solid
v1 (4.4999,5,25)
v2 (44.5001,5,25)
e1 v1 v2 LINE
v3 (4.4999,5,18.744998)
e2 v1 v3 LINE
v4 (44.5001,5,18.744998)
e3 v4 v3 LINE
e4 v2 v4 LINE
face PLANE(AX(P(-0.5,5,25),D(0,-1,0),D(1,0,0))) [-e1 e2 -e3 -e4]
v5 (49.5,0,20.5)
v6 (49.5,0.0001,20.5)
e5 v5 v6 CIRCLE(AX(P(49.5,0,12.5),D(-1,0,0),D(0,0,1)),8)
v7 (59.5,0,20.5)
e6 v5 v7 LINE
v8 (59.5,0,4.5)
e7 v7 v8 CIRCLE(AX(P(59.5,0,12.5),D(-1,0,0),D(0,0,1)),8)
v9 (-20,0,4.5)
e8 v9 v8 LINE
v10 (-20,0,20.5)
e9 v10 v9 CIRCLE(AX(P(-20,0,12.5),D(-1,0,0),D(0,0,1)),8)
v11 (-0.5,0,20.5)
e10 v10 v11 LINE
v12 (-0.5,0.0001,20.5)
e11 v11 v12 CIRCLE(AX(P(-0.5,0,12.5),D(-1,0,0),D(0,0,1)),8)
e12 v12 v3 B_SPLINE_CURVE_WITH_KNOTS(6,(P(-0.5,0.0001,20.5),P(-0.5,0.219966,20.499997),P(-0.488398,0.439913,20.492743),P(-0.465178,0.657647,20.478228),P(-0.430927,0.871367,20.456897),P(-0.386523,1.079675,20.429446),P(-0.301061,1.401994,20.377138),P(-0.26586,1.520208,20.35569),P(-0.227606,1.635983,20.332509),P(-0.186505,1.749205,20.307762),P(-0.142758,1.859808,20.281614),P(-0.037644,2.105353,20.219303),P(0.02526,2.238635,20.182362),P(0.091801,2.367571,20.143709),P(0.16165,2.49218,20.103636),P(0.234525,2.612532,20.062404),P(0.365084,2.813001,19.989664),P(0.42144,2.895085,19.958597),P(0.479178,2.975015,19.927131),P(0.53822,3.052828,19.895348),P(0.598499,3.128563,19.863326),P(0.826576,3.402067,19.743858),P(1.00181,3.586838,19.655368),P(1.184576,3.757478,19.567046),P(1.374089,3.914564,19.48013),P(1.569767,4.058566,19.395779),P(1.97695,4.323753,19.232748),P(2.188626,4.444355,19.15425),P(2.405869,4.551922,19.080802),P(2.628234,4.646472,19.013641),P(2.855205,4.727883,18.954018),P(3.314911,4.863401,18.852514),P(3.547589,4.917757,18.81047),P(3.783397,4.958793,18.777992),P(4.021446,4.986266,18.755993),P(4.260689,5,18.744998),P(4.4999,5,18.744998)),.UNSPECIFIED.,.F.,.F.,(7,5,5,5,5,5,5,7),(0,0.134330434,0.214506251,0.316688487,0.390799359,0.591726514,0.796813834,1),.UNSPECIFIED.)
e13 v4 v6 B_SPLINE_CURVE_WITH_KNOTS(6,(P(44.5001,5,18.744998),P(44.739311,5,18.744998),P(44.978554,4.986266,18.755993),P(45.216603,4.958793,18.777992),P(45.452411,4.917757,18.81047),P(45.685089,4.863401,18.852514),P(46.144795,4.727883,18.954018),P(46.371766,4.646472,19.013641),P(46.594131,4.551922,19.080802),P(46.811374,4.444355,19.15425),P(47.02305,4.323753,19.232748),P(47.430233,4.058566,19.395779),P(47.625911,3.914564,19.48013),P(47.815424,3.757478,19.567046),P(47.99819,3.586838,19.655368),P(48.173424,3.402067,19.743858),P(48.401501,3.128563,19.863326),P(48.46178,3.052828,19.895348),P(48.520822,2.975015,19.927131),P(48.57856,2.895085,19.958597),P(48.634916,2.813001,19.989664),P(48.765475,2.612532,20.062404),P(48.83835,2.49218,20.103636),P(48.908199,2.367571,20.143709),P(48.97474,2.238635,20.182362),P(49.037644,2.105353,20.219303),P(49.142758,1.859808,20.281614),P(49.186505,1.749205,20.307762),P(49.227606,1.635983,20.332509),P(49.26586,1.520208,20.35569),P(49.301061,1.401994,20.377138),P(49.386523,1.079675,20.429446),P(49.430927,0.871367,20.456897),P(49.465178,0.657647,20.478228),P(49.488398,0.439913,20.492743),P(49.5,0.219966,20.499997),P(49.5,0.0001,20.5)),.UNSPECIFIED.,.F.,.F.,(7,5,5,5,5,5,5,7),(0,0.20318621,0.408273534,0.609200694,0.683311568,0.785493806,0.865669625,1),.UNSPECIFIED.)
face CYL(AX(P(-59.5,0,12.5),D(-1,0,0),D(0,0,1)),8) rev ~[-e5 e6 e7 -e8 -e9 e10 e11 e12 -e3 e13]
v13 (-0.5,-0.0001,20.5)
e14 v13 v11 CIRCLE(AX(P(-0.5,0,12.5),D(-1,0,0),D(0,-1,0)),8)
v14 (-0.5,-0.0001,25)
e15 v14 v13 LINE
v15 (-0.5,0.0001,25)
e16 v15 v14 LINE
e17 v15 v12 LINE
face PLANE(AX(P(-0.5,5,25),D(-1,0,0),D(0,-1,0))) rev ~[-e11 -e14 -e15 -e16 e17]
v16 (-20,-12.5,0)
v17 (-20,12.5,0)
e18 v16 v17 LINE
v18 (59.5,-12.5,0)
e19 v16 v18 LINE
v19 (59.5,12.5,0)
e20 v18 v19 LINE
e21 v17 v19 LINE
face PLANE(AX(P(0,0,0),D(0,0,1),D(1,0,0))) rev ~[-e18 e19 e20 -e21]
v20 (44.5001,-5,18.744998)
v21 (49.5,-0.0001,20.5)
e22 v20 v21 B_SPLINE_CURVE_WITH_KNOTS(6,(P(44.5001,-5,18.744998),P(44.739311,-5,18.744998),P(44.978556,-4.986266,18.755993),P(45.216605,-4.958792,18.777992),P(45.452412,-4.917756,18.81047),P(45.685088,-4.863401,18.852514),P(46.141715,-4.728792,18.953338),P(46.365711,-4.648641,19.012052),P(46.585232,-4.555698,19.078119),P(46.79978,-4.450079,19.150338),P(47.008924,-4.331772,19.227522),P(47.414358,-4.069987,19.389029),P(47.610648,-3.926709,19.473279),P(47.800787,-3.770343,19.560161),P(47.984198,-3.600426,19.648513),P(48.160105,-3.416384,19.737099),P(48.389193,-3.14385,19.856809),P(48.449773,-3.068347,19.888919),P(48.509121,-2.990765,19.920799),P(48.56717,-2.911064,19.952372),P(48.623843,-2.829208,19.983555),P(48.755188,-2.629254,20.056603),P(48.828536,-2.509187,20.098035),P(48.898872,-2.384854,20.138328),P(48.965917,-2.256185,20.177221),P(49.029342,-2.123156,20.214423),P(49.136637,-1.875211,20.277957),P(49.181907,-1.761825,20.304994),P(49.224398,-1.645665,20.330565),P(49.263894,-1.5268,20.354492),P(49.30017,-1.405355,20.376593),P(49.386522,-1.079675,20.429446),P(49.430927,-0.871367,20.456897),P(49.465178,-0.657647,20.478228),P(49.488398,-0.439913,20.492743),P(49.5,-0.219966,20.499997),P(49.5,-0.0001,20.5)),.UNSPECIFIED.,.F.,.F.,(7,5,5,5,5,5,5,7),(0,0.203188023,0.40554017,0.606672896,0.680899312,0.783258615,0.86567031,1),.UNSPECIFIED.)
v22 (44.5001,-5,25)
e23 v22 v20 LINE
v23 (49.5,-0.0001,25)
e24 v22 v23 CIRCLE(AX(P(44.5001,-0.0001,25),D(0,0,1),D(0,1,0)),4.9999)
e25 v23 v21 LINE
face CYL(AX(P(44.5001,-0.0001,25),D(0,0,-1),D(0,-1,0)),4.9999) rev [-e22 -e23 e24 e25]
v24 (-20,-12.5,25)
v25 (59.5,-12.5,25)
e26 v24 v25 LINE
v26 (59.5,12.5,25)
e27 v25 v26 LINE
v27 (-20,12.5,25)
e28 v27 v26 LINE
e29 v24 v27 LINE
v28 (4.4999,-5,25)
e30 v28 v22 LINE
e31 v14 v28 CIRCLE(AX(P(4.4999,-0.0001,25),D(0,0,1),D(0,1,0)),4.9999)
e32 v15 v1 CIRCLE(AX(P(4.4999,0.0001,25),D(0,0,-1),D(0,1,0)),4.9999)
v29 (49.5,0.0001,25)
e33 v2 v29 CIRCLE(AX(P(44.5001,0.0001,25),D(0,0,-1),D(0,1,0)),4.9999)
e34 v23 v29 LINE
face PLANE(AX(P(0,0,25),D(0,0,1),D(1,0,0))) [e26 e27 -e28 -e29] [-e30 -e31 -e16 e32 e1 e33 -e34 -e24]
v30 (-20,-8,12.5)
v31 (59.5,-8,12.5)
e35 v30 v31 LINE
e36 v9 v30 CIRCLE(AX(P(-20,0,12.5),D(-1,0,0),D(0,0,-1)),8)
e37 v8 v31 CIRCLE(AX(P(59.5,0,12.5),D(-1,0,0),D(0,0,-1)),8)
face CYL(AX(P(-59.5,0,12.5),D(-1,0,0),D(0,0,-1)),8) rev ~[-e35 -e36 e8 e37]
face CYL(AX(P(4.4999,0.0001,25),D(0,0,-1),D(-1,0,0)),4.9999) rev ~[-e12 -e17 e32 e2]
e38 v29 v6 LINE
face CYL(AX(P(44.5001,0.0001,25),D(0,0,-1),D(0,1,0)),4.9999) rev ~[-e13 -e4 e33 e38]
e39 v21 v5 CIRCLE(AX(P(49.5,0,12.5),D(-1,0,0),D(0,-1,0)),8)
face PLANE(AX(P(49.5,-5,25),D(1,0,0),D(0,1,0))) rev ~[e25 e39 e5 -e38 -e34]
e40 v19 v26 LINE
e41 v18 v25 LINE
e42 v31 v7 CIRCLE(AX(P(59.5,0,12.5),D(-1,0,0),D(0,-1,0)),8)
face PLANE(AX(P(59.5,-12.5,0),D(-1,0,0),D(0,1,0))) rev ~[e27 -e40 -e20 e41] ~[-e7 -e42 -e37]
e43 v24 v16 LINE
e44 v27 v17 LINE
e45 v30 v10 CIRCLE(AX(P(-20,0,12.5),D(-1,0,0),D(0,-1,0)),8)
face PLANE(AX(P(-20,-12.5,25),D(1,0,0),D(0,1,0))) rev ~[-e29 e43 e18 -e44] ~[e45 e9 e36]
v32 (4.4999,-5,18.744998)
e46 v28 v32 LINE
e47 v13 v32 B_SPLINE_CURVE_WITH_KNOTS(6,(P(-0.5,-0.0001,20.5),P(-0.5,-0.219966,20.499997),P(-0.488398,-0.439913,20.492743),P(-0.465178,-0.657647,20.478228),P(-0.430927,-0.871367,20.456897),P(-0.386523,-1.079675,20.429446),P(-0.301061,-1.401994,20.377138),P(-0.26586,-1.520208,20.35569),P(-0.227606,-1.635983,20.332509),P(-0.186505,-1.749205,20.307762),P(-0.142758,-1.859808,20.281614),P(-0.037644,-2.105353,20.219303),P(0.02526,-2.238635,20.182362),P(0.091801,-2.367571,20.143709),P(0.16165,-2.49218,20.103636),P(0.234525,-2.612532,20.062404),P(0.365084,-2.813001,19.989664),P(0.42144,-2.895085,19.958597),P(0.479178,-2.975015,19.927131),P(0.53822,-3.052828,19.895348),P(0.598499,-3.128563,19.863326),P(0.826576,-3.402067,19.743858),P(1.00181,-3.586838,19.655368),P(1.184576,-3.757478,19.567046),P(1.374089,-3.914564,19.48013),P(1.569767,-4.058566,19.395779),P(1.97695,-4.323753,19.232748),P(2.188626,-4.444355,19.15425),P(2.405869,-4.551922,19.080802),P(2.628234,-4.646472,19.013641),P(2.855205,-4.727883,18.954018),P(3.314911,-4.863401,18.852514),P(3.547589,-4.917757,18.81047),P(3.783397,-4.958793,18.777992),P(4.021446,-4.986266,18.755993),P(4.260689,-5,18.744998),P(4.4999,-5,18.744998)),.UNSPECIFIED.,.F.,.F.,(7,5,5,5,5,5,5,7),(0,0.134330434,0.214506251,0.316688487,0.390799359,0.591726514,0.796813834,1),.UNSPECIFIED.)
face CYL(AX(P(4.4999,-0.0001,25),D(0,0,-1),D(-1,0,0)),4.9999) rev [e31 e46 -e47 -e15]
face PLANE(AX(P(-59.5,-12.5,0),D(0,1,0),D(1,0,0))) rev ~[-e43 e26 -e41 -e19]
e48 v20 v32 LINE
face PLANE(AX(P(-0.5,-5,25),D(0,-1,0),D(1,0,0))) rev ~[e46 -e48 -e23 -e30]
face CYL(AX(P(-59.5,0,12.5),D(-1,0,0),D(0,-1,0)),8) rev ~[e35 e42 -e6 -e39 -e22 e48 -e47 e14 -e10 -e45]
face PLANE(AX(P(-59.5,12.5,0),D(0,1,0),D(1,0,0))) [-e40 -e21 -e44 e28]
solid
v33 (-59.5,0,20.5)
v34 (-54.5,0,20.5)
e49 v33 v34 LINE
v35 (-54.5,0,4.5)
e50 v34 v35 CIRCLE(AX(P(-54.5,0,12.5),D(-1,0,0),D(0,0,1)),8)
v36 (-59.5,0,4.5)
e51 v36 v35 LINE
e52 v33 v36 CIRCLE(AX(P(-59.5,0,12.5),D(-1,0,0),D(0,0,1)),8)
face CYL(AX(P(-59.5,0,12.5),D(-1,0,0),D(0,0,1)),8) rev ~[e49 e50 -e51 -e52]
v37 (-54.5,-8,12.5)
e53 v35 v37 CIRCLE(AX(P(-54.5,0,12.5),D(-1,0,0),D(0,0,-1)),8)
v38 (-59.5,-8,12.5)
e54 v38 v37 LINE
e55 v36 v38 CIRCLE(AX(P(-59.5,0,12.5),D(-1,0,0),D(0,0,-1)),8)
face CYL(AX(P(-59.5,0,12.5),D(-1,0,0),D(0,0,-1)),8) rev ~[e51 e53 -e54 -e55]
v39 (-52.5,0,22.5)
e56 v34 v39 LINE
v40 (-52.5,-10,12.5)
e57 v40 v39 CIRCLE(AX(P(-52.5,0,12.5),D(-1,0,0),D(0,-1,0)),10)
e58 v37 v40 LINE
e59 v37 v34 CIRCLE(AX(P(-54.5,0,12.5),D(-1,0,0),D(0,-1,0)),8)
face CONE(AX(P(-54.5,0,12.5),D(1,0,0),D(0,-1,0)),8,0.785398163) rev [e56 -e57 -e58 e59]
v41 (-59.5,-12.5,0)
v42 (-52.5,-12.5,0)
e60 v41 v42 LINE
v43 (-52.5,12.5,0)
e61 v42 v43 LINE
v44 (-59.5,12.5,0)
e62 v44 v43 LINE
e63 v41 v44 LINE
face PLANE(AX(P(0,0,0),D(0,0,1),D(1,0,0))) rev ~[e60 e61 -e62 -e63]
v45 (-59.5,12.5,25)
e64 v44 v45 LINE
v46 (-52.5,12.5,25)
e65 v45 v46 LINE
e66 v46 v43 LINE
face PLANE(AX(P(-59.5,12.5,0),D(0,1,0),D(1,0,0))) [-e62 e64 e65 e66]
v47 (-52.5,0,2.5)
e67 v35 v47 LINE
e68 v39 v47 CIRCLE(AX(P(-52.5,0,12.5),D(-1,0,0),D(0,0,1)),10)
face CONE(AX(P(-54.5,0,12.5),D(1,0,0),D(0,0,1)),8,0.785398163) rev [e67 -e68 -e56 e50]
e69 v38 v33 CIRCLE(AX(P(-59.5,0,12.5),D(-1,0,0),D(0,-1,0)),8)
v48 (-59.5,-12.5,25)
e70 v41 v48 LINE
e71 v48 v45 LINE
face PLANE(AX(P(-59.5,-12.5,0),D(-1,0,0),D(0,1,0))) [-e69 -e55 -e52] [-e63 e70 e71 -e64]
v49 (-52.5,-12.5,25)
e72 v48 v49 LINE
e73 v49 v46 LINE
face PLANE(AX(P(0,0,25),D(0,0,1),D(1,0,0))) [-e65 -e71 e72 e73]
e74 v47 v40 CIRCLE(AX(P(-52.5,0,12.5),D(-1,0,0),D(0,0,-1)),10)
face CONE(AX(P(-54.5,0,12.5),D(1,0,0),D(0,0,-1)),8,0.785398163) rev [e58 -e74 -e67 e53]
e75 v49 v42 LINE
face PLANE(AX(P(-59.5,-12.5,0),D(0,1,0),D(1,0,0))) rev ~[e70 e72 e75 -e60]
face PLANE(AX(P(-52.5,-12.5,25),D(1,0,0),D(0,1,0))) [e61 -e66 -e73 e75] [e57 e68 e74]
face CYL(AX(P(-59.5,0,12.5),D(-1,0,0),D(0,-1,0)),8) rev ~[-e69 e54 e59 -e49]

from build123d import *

# Parameters (mm, degrees)
F0_W     = 119
F0_H     = 25
F1_DEPTH = 25
F3_DEPTH = 119.001
F4_W     = 32.5
F4_H     = 25
F5_DEPTH = 25.001
F6_SIZE  = 2
F7_W     = 50
F7_H     = 5
F8_DEPTH = 10
F9_R     = 4.9999
F10_R    = 4.9999


# Not quite as in the source:
# - a fillet or chamfer is up to 0.001 mm smaller than in the source, because OpenCascade refuses the exact size


with BuildPart() as f1:
    # F0 (on Top) → F1 (new body)
    with BuildSketch(Plane.XY):
        Rectangle(F0_W, F0_H)
    extrude(amount=F1_DEPTH)

    # F2 (on face) → F3 (cut, through all)
    with BuildSketch(Plane(origin=(-59.5, 0, 0), x_dir=(0, -1, 0), z_dir=(-1, 0, 0))):
        with BuildLine():
            ThreePointArc((8, 12.5), (5.6568542495, 18.1568542495), (0, 20.5))
            Line((0, 20.5), (0, 4.5))
            ThreePointArc((0, 4.5), (5.6568542495, 6.8431457505), (8, 12.5))
        make_face()
        with BuildLine():
            Line((0, 4.5), (0, 20.5))
            ThreePointArc((0, 20.5), (-8, 12.5), (0, 4.5))
        make_face()
    extrude(amount=-F3_DEPTH, mode=Mode.SUBTRACT)

    # F4 (on face) → F5 (cut, through all)
    with BuildSketch(Plane.XY.offset(25)):
        with Locations((-36.25, 0)):
            Rectangle(F4_W, F4_H)
    extrude(amount=-F5_DEPTH, mode=Mode.SUBTRACT)

    # F6
    f6_edges = [f1.edges().sort_by_distance(p)[0] for p in [
        (-52.5, 8, 12.5),
    ]]
    chamfer(f6_edges, length=F6_SIZE)

    # F7 (on face) → F8 (cut)
    with BuildSketch(Plane.XY.offset(25)):
        with Locations((24.5, 2.5)):
            Rectangle(F7_W, F7_H)
        with Locations((24.5, -2.5)):
            Rectangle(F7_W, F7_H)
    extrude(amount=-F8_DEPTH, mode=Mode.SUBTRACT)

    # F9 (radius 5 in the source; OpenCascade refuses exactly that, so slightly less here)
    f9_edges = [f1.edges().sort_by_distance(p)[0] for p in [
        (-0.5, 5, 21.872499),
        (-0.5, -5, 21.872499),
    ]]
    fillet(f9_edges, radius=F9_R)

    # F10 (radius 5 in the source; OpenCascade refuses exactly that, so slightly less here)
    f10_edges = [f1.edges().sort_by_distance(p)[0] for p in [
        (49.5, 5, 21.872499),
        (49.5, -5, 21.872499),
    ]]
    fillet(f10_edges, radius=F10_R)


solid = f1.part
